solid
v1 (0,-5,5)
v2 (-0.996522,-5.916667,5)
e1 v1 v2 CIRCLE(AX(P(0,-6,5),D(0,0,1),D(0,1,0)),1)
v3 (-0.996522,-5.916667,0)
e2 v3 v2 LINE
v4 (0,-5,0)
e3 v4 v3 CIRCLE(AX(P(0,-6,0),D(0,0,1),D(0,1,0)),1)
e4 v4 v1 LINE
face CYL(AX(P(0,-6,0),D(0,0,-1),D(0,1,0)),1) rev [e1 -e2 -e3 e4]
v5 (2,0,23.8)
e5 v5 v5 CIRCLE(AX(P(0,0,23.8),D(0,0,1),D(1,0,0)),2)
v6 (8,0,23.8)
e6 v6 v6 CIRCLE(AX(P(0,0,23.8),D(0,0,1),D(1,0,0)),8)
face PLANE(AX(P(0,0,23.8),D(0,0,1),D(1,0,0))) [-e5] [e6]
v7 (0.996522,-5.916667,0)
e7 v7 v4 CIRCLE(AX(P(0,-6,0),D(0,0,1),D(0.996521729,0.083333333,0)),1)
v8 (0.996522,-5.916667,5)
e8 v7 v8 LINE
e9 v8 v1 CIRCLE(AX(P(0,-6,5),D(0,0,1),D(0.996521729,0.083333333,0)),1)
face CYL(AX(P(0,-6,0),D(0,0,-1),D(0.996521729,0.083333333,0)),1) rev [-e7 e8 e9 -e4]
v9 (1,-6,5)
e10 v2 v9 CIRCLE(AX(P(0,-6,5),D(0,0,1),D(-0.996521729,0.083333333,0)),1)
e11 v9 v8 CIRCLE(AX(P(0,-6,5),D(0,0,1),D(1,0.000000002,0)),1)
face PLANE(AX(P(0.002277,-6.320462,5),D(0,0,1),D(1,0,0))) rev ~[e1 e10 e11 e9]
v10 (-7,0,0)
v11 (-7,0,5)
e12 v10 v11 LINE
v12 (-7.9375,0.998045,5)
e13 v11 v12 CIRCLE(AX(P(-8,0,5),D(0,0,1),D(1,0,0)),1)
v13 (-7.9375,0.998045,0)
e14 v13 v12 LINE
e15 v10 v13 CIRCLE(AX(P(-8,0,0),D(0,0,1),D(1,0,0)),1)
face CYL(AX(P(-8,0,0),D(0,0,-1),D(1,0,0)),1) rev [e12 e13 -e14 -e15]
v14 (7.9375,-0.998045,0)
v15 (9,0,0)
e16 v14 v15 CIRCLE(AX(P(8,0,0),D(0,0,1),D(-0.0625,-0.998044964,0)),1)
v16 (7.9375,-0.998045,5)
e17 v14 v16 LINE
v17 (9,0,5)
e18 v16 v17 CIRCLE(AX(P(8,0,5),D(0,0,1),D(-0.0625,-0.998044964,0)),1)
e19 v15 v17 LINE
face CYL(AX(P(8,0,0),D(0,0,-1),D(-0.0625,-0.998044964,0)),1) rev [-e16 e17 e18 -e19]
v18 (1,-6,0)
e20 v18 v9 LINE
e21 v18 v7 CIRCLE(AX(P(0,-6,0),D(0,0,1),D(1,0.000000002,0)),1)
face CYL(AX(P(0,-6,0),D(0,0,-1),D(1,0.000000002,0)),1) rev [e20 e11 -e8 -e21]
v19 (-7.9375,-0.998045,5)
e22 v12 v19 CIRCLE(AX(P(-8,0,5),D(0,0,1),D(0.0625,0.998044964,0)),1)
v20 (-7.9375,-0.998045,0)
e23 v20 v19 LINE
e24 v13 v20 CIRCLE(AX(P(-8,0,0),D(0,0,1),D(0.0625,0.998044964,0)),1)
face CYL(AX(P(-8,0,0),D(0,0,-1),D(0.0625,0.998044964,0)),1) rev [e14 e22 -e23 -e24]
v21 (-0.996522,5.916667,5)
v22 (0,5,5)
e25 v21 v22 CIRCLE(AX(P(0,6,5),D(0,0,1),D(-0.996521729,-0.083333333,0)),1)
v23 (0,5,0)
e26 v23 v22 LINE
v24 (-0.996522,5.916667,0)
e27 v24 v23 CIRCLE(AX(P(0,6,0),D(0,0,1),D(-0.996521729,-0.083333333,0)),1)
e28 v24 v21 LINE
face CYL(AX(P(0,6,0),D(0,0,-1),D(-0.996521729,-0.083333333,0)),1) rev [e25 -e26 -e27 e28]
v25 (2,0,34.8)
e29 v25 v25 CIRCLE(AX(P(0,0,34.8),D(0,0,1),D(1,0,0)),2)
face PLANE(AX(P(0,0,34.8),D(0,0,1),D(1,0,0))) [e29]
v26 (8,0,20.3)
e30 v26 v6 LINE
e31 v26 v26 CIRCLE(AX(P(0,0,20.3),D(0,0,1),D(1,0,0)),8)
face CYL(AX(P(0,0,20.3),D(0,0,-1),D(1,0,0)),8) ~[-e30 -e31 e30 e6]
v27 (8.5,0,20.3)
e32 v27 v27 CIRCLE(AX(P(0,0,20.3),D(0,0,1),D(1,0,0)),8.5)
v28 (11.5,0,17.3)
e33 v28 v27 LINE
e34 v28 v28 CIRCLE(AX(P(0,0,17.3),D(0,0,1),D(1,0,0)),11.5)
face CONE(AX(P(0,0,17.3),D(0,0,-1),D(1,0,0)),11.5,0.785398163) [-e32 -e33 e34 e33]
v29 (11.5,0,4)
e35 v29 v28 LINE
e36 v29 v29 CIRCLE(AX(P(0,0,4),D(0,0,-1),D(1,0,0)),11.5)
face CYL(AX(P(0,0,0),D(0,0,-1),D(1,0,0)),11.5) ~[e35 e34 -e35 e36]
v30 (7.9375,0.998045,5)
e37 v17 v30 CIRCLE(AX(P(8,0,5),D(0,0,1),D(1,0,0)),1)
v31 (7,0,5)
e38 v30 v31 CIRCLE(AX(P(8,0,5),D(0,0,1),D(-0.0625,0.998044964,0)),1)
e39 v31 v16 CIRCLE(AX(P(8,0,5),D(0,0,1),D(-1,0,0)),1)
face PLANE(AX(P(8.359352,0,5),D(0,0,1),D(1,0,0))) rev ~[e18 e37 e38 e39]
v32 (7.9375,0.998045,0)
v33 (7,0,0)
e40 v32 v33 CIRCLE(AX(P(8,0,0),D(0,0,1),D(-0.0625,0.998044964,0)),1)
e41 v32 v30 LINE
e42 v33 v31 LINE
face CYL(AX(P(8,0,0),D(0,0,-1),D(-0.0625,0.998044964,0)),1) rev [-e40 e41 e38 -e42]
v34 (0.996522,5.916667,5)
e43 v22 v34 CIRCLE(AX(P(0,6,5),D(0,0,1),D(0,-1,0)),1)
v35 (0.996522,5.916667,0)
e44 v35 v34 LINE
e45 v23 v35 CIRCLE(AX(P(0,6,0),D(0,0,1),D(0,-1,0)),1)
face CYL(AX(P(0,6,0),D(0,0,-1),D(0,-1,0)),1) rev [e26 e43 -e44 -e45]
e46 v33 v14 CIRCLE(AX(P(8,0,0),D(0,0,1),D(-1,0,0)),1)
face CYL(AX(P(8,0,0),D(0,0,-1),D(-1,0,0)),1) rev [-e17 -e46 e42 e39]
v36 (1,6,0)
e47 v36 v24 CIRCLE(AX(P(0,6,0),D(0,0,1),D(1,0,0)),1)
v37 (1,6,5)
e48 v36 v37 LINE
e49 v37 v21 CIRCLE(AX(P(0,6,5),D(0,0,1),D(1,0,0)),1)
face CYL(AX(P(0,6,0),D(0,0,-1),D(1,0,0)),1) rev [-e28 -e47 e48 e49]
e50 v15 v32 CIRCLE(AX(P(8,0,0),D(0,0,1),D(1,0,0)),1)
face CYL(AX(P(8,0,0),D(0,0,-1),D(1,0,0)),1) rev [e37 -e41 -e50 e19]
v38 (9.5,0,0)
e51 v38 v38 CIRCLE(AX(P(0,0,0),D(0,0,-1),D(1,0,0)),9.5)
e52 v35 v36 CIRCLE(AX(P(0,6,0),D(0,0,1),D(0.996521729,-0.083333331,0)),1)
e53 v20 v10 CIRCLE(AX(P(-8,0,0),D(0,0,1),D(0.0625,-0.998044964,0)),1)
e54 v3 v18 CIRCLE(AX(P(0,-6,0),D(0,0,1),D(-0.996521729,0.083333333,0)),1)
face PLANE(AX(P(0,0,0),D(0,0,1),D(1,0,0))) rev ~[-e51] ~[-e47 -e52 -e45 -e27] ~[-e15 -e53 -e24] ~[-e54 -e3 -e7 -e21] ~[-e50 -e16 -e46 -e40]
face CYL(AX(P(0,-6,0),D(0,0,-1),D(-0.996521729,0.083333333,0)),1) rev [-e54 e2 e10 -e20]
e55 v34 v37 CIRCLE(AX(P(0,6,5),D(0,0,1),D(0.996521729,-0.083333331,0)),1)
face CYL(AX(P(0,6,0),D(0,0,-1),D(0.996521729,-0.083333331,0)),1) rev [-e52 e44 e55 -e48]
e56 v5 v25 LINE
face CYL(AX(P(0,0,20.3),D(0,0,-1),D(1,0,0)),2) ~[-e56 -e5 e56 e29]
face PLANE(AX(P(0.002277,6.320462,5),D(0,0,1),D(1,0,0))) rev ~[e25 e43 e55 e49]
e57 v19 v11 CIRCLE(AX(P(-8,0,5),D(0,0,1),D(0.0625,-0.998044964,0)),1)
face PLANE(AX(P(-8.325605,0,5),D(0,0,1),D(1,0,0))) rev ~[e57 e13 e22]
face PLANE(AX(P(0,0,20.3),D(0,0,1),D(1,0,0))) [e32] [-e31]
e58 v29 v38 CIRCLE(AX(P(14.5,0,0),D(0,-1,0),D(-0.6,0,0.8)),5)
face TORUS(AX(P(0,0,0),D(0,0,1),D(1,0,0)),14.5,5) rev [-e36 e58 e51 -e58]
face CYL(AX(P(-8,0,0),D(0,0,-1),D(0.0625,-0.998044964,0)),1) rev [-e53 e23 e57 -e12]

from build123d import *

# Parameters (mm, degrees)
F0_R     = 11.5
F1_DEPTH = 20.3
F2_R     = 11.5
F2_R_2   = 9.5
F3_DEPTH = 4
F5_DEPTH = 5
F6_SIZE  = 3
F7_R     = 2
F8_DEPTH = 14.5
F7_R_2   = 8
F9_DEPTH = 3.5


# Not quite as in the source:
# - a fillet or chamfer that OpenCascade refuses, or shapes differently, is made with other operations: its cross-section is extruded or revolved along the edge and cut away or added


with BuildPart() as f1:
    # F0 (on Top) → F1 (new body)
    with BuildSketch(Plane.XY):
        Circle(F0_R)
        with BuildLine():
            ThreePointArc((-7.9375, 0.9980449639), (0, 8), (7.9375, 0.9980449639))
            ThreePointArc((7.9375, 0.9980449639), (8.6846531969, 0.7288689869), (9, 0))
            ThreePointArc((9, 0), (8.6846531969, -0.7288689869), (7.9375, -0.9980449639))
            ThreePointArc((7.9375, -0.9980449639), (0, -8), (-7.9375, -0.9980449639))
            ThreePointArc((-7.9375, -0.9980449639), (-9, 0), (-7.9375, 0.9980449639))
        make_face(mode=Mode.SUBTRACT)
        with BuildLine():
            ThreePointArc((7.9375, 0.9980449639), (7.9843597113, 0.5), (8, 0))
            ThreePointArc((8, 0), (7.9843597113, -0.5), (7.9375, -0.9980449639))
            ThreePointArc((7.9375, -0.9980449639), (8.6846531969, -0.7288689869), (9, 0))
            ThreePointArc((9, 0), (8.6846531969, 0.7288689869), (7.9375, 0.9980449639))
        make_face()
        with BuildLine():
            ThreePointArc((7, 0), (7.2711310131, 0.6846531969), (7.9375, 0.9980449639))
            ThreePointArc((7.9375, 0.9980449639), (0, 8), (-7.9375, 0.9980449639))
            ThreePointArc((-7.9375, 0.9980449639), (-7.2711310131, 0.6846531969), (-7, 0))
            Line((-7, 0), (-6, 0))
            ThreePointArc((-6, 0), (-4.5814370219, 3.8743302407), (-0.9965217286, 5.9166666667))
            ThreePointArc((-0.9965217286, 5.9166666667), (-0.041702946, 6.9991300537), (1, 6))
            ThreePointArc((1, 6), (0.9991300537, 5.958297054), (0.9965217286, 5.9166666667))
            ThreePointArc((0.9965217286, 5.9166666667), (4.5814370219, 3.8743302407), (6, 0))
            Line((6, 0), (7, 0))
        make_face()
        with BuildLine():
            Line((0, 0), (6, 0))
            ThreePointArc((6, 0), (4.5814370219, 3.8743302407), (0.9965217286, 5.9166666667))
            ThreePointArc((0.9965217286, 5.9166666667), (0.6770032004, 5.2640199278), (0, 5))
            Line((0, 5), (0, 0))
        make_face()
        with BuildLine():
            Line((-6, 0), (0, 0))
            Line((0, 0), (0, 5))
            ThreePointArc((0, 5), (-0.6770032004, 5.2640199278), (-0.9965217286, 5.9166666667))
            ThreePointArc((-0.9965217286, 5.9166666667), (-4.5814370219, 3.8743302407), (-6, 0))
        make_face()
        with BuildLine():
            Line((0, -5), (0, 0))
            Line((0, 0), (-6, 0))
            ThreePointArc((-6, 0), (-4.5814370219, -3.8743302407), (-0.9965217286, -5.9166666667))
            ThreePointArc((-0.9965217286, -5.9166666667), (-0.6770032004, -5.2640199278), (0, -5))
        make_face()
        with BuildLine():
            ThreePointArc((0.9965217286, -5.9166666667), (4.5814370219, -3.8743302407), (6, 0))
            Line((6, 0), (0, 0))
            Line((0, 0), (0, -5))
            ThreePointArc((0, -5), (0.6770032004, -5.2640199278), (0.9965217286, -5.9166666667))
        make_face()
        with BuildLine():
            ThreePointArc((0, 5), (0.6770032004, 5.2640199278), (0.9965217286, 5.9166666667))
            ThreePointArc((0.9965217286, 5.9166666667), (0.5, 5.9791303716), (0, 6))
            Line((0, 6), (0, 5))
        make_face()
        with BuildLine():
            Line((0, 5), (0, 6))
            ThreePointArc((0, 6), (-0.5, 5.9791303716), (-0.9965217286, 5.9166666667))
            ThreePointArc((-0.9965217286, 5.9166666667), (-0.6770032004, 5.2640199278), (0, 5))
        make_face()
        with BuildLine():
            ThreePointArc((0, 6), (0.5, 5.9791303716), (0.9965217286, 5.9166666667))
            ThreePointArc((0.9965217286, 5.9166666667), (0.9991300537, 5.958297054), (1, 6))
            ThreePointArc((1, 6), (-0.041702946, 6.9991300537), (-0.9965217286, 5.9166666667))
            ThreePointArc((-0.9965217286, 5.9166666667), (-0.5, 5.9791303716), (0, 6))
        make_face()
        with BuildLine():
            ThreePointArc((7.9375, -0.9980449639), (7.9843597113, -0.5), (8, 0))
            Line((8, 0), (7, 0))
            ThreePointArc((7, 0), (7.2711310131, -0.6846531969), (7.9375, -0.9980449639))
        make_face()
        with BuildLine():
            Line((7, 0), (8, 0))
            ThreePointArc((8, 0), (7.9843597113, 0.5), (7.9375, 0.9980449639))
            ThreePointArc((7.9375, 0.9980449639), (7.2711310131, 0.6846531969), (7, 0))
        make_face()
        with BuildLine():
            ThreePointArc((-7.9375, -0.9980449639), (0, -8), (7.9375, -0.9980449639))
            ThreePointArc((7.9375, -0.9980449639), (7.2711310131, -0.6846531969), (7, 0))
            Line((7, 0), (6, 0))
            ThreePointArc((6, 0), (4.5814370219, -3.8743302407), (0.9965217286, -5.9166666667))
            ThreePointArc((0.9965217286, -5.9166666667), (0.9991300537, -5.958297054), (1, -6))
            ThreePointArc((1, -6), (-0.041702946, -6.9991300537), (-0.9965217286, -5.9166666667))
            ThreePointArc((-0.9965217286, -5.9166666667), (-4.5814370219, -3.8743302407), (-6, 0))
            Line((-6, 0), (-7, 0))
            ThreePointArc((-7, 0), (-7.2711310131, -0.6846531969), (-7.9375, -0.9980449639))
        make_face()
        with BuildLine():
            ThreePointArc((1, -6), (0.9991300537, -5.958297054), (0.9965217286, -5.9166666667))
            ThreePointArc((0.9965217286, -5.9166666667), (0.5, -5.9791303716), (0, -6))
            ThreePointArc((0, -6), (-0.5, -5.9791303716), (-0.9965217286, -5.9166666667))
            ThreePointArc((-0.9965217286, -5.9166666667), (-0.041702946, -6.9991300537), (1, -6))
        make_face()
        with BuildLine():
            ThreePointArc((0, -6), (0.5, -5.9791303716), (0.9965217286, -5.9166666667))
            ThreePointArc((0.9965217286, -5.9166666667), (0.6770032004, -5.2640199278), (0, -5))
            Line((0, -5), (0, -6))
        make_face()
        with BuildLine():
            ThreePointArc((-0.9965217286, -5.9166666667), (-0.5, -5.9791303716), (0, -6))
            Line((0, -6), (0, -5))
            ThreePointArc((0, -5), (-0.6770032004, -5.2640199278), (-0.9965217286, -5.9166666667))
        make_face()
        with BuildLine():
            ThreePointArc((-8, 0), (-7.9843597113, -0.5), (-7.9375, -0.9980449639))
            ThreePointArc((-7.9375, -0.9980449639), (-7.2711310131, -0.6846531969), (-7, 0))
            Line((-7, 0), (-8, 0))
        make_face()
        with BuildLine():
            ThreePointArc((-8, 0), (-7.9843597113, 0.5), (-7.9375, 0.9980449639))
            ThreePointArc((-7.9375, 0.9980449639), (-9, 0), (-7.9375, -0.9980449639))
            ThreePointArc((-7.9375, -0.9980449639), (-7.9843597113, -0.5), (-8, 0))
        make_face()
        with BuildLine():
            ThreePointArc((-7, 0), (-7.2711310131, 0.6846531969), (-7.9375, 0.9980449639))
            ThreePointArc((-7.9375, 0.9980449639), (-7.9843597113, 0.5), (-8, 0))
            Line((-8, 0), (-7, 0))
        make_face()
    extrude(amount=F1_DEPTH)

    # F2 (on face) → F3 (cut)
    with BuildSketch(Plane(origin=(0, 0, 0), x_dir=(1, 0, 0), z_dir=(0, 0, -1))):
        Circle(F2_R)
        Circle(F2_R_2, mode=Mode.SUBTRACT)
    extrude(amount=-F3_DEPTH, mode=Mode.SUBTRACT)

    # F4: fillet of radius 5 on 1 edges, made by hand

    # F4_s1 → F4_t2 (revolve)
    with BuildSketch(Plane.XZ):
        with BuildLine():
            ThreePointArc((11.5, 4), (10.027864045, 2.2360679775), (9.5, 0))
            Line((9.5, 0), (9.5, 4))
            Line((9.5, 4), (11.5, 4))
        make_face()
    revolve(axis=Axis((0, 0, 4), (0, 0, -1)))

    # F0 (on Top) → F5 (cut)
    with BuildSketch(Plane.XY):
        with BuildLine():
            ThreePointArc((-8, 0), (-7.9843597113, 0.5), (-7.9375, 0.9980449639))
            ThreePointArc((-7.9375, 0.9980449639), (-9, 0), (-7.9375, -0.9980449639))
            ThreePointArc((-7.9375, -0.9980449639), (-7.9843597113, -0.5), (-8, 0))
        make_face()
        with BuildLine():
            ThreePointArc((-8, 0), (-7.9843597113, -0.5), (-7.9375, -0.9980449639))
            ThreePointArc((-7.9375, -0.9980449639), (-7.2711310131, -0.6846531969), (-7, 0))
            Line((-7, 0), (-8, 0))
        make_face()
        with BuildLine():
            ThreePointArc((-7, 0), (-7.2711310131, 0.6846531969), (-7.9375, 0.9980449639))
            ThreePointArc((-7.9375, 0.9980449639), (-7.9843597113, 0.5), (-8, 0))
            Line((-8, 0), (-7, 0))
        make_face()
        with BuildLine():
            ThreePointArc((0, 6), (0.5, 5.9791303716), (0.9965217286, 5.9166666667))
            ThreePointArc((0.9965217286, 5.9166666667), (0.9991300537, 5.958297054), (1, 6))
            ThreePointArc((1, 6), (-0.041702946, 6.9991300537), (-0.9965217286, 5.9166666667))
            ThreePointArc((-0.9965217286, 5.9166666667), (-0.5, 5.9791303716), (0, 6))
        make_face()
        with BuildLine():
            ThreePointArc((0, 5), (0.6770032004, 5.2640199278), (0.9965217286, 5.9166666667))
            ThreePointArc((0.9965217286, 5.9166666667), (0.5, 5.9791303716), (0, 6))
            Line((0, 6), (0, 5))
        make_face()
        with BuildLine():
            Line((0, 5), (0, 6))
            ThreePointArc((0, 6), (-0.5, 5.9791303716), (-0.9965217286, 5.9166666667))
            ThreePointArc((-0.9965217286, 5.9166666667), (-0.6770032004, 5.2640199278), (0, 5))
        make_face()
        with BuildLine():
            ThreePointArc((7.9375, 0.9980449639), (7.9843597113, 0.5), (8, 0))
            ThreePointArc((8, 0), (7.9843597113, -0.5), (7.9375, -0.9980449639))
            ThreePointArc((7.9375, -0.9980449639), (8.6846531969, -0.7288689869), (9, 0))
            ThreePointArc((9, 0), (8.6846531969, 0.7288689869), (7.9375, 0.9980449639))
        make_face()
        with BuildLine():
            ThreePointArc((7.9375, -0.9980449639), (7.9843597113, -0.5), (8, 0))
            Line((8, 0), (7, 0))
            ThreePointArc((7, 0), (7.2711310131, -0.6846531969), (7.9375, -0.9980449639))
        make_face()
        with BuildLine():
            Line((7, 0), (8, 0))
            ThreePointArc((8, 0), (7.9843597113, 0.5), (7.9375, 0.9980449639))
            ThreePointArc((7.9375, 0.9980449639), (7.2711310131, 0.6846531969), (7, 0))
        make_face()
        with BuildLine():
            ThreePointArc((1, -6), (0.9991300537, -5.958297054), (0.9965217286, -5.9166666667))
            ThreePointArc((0.9965217286, -5.9166666667), (0.5, -5.9791303716), (0, -6))
            ThreePointArc((0, -6), (-0.5, -5.9791303716), (-0.9965217286, -5.9166666667))
            ThreePointArc((-0.9965217286, -5.9166666667), (-0.041702946, -6.9991300537), (1, -6))
        make_face()
        with BuildLine():
            ThreePointArc((-0.9965217286, -5.9166666667), (-0.5, -5.9791303716), (0, -6))
            Line((0, -6), (0, -5))
            ThreePointArc((0, -5), (-0.6770032004, -5.2640199278), (-0.9965217286, -5.9166666667))
        make_face()
        with BuildLine():
            ThreePointArc((0, -6), (0.5, -5.9791303716), (0.9965217286, -5.9166666667))
            ThreePointArc((0.9965217286, -5.9166666667), (0.6770032004, -5.2640199278), (0, -5))
            Line((0, -5), (0, -6))
        make_face()
    extrude(amount=F5_DEPTH, mode=Mode.SUBTRACT)

    # F6
    f6_edges = [f1.edges().sort_by_distance(p)[0] for p in [
        (-11.5, 0, 20.3),
    ]]
    chamfer(f6_edges, length=F6_SIZE)

    # F7 (on face) → F8 (join)
    with BuildSketch(Plane.XY.offset(20.3)):
        Circle(F7_R)
    extrude(amount=F8_DEPTH)

    # F7 (on face) → F9 (join)
    with BuildSketch(Plane.XY.offset(20.3)):
        Circle(F7_R_2)
        Circle(F7_R, mode=Mode.SUBTRACT)
    extrude(amount=F9_DEPTH)


solid = f1.part
